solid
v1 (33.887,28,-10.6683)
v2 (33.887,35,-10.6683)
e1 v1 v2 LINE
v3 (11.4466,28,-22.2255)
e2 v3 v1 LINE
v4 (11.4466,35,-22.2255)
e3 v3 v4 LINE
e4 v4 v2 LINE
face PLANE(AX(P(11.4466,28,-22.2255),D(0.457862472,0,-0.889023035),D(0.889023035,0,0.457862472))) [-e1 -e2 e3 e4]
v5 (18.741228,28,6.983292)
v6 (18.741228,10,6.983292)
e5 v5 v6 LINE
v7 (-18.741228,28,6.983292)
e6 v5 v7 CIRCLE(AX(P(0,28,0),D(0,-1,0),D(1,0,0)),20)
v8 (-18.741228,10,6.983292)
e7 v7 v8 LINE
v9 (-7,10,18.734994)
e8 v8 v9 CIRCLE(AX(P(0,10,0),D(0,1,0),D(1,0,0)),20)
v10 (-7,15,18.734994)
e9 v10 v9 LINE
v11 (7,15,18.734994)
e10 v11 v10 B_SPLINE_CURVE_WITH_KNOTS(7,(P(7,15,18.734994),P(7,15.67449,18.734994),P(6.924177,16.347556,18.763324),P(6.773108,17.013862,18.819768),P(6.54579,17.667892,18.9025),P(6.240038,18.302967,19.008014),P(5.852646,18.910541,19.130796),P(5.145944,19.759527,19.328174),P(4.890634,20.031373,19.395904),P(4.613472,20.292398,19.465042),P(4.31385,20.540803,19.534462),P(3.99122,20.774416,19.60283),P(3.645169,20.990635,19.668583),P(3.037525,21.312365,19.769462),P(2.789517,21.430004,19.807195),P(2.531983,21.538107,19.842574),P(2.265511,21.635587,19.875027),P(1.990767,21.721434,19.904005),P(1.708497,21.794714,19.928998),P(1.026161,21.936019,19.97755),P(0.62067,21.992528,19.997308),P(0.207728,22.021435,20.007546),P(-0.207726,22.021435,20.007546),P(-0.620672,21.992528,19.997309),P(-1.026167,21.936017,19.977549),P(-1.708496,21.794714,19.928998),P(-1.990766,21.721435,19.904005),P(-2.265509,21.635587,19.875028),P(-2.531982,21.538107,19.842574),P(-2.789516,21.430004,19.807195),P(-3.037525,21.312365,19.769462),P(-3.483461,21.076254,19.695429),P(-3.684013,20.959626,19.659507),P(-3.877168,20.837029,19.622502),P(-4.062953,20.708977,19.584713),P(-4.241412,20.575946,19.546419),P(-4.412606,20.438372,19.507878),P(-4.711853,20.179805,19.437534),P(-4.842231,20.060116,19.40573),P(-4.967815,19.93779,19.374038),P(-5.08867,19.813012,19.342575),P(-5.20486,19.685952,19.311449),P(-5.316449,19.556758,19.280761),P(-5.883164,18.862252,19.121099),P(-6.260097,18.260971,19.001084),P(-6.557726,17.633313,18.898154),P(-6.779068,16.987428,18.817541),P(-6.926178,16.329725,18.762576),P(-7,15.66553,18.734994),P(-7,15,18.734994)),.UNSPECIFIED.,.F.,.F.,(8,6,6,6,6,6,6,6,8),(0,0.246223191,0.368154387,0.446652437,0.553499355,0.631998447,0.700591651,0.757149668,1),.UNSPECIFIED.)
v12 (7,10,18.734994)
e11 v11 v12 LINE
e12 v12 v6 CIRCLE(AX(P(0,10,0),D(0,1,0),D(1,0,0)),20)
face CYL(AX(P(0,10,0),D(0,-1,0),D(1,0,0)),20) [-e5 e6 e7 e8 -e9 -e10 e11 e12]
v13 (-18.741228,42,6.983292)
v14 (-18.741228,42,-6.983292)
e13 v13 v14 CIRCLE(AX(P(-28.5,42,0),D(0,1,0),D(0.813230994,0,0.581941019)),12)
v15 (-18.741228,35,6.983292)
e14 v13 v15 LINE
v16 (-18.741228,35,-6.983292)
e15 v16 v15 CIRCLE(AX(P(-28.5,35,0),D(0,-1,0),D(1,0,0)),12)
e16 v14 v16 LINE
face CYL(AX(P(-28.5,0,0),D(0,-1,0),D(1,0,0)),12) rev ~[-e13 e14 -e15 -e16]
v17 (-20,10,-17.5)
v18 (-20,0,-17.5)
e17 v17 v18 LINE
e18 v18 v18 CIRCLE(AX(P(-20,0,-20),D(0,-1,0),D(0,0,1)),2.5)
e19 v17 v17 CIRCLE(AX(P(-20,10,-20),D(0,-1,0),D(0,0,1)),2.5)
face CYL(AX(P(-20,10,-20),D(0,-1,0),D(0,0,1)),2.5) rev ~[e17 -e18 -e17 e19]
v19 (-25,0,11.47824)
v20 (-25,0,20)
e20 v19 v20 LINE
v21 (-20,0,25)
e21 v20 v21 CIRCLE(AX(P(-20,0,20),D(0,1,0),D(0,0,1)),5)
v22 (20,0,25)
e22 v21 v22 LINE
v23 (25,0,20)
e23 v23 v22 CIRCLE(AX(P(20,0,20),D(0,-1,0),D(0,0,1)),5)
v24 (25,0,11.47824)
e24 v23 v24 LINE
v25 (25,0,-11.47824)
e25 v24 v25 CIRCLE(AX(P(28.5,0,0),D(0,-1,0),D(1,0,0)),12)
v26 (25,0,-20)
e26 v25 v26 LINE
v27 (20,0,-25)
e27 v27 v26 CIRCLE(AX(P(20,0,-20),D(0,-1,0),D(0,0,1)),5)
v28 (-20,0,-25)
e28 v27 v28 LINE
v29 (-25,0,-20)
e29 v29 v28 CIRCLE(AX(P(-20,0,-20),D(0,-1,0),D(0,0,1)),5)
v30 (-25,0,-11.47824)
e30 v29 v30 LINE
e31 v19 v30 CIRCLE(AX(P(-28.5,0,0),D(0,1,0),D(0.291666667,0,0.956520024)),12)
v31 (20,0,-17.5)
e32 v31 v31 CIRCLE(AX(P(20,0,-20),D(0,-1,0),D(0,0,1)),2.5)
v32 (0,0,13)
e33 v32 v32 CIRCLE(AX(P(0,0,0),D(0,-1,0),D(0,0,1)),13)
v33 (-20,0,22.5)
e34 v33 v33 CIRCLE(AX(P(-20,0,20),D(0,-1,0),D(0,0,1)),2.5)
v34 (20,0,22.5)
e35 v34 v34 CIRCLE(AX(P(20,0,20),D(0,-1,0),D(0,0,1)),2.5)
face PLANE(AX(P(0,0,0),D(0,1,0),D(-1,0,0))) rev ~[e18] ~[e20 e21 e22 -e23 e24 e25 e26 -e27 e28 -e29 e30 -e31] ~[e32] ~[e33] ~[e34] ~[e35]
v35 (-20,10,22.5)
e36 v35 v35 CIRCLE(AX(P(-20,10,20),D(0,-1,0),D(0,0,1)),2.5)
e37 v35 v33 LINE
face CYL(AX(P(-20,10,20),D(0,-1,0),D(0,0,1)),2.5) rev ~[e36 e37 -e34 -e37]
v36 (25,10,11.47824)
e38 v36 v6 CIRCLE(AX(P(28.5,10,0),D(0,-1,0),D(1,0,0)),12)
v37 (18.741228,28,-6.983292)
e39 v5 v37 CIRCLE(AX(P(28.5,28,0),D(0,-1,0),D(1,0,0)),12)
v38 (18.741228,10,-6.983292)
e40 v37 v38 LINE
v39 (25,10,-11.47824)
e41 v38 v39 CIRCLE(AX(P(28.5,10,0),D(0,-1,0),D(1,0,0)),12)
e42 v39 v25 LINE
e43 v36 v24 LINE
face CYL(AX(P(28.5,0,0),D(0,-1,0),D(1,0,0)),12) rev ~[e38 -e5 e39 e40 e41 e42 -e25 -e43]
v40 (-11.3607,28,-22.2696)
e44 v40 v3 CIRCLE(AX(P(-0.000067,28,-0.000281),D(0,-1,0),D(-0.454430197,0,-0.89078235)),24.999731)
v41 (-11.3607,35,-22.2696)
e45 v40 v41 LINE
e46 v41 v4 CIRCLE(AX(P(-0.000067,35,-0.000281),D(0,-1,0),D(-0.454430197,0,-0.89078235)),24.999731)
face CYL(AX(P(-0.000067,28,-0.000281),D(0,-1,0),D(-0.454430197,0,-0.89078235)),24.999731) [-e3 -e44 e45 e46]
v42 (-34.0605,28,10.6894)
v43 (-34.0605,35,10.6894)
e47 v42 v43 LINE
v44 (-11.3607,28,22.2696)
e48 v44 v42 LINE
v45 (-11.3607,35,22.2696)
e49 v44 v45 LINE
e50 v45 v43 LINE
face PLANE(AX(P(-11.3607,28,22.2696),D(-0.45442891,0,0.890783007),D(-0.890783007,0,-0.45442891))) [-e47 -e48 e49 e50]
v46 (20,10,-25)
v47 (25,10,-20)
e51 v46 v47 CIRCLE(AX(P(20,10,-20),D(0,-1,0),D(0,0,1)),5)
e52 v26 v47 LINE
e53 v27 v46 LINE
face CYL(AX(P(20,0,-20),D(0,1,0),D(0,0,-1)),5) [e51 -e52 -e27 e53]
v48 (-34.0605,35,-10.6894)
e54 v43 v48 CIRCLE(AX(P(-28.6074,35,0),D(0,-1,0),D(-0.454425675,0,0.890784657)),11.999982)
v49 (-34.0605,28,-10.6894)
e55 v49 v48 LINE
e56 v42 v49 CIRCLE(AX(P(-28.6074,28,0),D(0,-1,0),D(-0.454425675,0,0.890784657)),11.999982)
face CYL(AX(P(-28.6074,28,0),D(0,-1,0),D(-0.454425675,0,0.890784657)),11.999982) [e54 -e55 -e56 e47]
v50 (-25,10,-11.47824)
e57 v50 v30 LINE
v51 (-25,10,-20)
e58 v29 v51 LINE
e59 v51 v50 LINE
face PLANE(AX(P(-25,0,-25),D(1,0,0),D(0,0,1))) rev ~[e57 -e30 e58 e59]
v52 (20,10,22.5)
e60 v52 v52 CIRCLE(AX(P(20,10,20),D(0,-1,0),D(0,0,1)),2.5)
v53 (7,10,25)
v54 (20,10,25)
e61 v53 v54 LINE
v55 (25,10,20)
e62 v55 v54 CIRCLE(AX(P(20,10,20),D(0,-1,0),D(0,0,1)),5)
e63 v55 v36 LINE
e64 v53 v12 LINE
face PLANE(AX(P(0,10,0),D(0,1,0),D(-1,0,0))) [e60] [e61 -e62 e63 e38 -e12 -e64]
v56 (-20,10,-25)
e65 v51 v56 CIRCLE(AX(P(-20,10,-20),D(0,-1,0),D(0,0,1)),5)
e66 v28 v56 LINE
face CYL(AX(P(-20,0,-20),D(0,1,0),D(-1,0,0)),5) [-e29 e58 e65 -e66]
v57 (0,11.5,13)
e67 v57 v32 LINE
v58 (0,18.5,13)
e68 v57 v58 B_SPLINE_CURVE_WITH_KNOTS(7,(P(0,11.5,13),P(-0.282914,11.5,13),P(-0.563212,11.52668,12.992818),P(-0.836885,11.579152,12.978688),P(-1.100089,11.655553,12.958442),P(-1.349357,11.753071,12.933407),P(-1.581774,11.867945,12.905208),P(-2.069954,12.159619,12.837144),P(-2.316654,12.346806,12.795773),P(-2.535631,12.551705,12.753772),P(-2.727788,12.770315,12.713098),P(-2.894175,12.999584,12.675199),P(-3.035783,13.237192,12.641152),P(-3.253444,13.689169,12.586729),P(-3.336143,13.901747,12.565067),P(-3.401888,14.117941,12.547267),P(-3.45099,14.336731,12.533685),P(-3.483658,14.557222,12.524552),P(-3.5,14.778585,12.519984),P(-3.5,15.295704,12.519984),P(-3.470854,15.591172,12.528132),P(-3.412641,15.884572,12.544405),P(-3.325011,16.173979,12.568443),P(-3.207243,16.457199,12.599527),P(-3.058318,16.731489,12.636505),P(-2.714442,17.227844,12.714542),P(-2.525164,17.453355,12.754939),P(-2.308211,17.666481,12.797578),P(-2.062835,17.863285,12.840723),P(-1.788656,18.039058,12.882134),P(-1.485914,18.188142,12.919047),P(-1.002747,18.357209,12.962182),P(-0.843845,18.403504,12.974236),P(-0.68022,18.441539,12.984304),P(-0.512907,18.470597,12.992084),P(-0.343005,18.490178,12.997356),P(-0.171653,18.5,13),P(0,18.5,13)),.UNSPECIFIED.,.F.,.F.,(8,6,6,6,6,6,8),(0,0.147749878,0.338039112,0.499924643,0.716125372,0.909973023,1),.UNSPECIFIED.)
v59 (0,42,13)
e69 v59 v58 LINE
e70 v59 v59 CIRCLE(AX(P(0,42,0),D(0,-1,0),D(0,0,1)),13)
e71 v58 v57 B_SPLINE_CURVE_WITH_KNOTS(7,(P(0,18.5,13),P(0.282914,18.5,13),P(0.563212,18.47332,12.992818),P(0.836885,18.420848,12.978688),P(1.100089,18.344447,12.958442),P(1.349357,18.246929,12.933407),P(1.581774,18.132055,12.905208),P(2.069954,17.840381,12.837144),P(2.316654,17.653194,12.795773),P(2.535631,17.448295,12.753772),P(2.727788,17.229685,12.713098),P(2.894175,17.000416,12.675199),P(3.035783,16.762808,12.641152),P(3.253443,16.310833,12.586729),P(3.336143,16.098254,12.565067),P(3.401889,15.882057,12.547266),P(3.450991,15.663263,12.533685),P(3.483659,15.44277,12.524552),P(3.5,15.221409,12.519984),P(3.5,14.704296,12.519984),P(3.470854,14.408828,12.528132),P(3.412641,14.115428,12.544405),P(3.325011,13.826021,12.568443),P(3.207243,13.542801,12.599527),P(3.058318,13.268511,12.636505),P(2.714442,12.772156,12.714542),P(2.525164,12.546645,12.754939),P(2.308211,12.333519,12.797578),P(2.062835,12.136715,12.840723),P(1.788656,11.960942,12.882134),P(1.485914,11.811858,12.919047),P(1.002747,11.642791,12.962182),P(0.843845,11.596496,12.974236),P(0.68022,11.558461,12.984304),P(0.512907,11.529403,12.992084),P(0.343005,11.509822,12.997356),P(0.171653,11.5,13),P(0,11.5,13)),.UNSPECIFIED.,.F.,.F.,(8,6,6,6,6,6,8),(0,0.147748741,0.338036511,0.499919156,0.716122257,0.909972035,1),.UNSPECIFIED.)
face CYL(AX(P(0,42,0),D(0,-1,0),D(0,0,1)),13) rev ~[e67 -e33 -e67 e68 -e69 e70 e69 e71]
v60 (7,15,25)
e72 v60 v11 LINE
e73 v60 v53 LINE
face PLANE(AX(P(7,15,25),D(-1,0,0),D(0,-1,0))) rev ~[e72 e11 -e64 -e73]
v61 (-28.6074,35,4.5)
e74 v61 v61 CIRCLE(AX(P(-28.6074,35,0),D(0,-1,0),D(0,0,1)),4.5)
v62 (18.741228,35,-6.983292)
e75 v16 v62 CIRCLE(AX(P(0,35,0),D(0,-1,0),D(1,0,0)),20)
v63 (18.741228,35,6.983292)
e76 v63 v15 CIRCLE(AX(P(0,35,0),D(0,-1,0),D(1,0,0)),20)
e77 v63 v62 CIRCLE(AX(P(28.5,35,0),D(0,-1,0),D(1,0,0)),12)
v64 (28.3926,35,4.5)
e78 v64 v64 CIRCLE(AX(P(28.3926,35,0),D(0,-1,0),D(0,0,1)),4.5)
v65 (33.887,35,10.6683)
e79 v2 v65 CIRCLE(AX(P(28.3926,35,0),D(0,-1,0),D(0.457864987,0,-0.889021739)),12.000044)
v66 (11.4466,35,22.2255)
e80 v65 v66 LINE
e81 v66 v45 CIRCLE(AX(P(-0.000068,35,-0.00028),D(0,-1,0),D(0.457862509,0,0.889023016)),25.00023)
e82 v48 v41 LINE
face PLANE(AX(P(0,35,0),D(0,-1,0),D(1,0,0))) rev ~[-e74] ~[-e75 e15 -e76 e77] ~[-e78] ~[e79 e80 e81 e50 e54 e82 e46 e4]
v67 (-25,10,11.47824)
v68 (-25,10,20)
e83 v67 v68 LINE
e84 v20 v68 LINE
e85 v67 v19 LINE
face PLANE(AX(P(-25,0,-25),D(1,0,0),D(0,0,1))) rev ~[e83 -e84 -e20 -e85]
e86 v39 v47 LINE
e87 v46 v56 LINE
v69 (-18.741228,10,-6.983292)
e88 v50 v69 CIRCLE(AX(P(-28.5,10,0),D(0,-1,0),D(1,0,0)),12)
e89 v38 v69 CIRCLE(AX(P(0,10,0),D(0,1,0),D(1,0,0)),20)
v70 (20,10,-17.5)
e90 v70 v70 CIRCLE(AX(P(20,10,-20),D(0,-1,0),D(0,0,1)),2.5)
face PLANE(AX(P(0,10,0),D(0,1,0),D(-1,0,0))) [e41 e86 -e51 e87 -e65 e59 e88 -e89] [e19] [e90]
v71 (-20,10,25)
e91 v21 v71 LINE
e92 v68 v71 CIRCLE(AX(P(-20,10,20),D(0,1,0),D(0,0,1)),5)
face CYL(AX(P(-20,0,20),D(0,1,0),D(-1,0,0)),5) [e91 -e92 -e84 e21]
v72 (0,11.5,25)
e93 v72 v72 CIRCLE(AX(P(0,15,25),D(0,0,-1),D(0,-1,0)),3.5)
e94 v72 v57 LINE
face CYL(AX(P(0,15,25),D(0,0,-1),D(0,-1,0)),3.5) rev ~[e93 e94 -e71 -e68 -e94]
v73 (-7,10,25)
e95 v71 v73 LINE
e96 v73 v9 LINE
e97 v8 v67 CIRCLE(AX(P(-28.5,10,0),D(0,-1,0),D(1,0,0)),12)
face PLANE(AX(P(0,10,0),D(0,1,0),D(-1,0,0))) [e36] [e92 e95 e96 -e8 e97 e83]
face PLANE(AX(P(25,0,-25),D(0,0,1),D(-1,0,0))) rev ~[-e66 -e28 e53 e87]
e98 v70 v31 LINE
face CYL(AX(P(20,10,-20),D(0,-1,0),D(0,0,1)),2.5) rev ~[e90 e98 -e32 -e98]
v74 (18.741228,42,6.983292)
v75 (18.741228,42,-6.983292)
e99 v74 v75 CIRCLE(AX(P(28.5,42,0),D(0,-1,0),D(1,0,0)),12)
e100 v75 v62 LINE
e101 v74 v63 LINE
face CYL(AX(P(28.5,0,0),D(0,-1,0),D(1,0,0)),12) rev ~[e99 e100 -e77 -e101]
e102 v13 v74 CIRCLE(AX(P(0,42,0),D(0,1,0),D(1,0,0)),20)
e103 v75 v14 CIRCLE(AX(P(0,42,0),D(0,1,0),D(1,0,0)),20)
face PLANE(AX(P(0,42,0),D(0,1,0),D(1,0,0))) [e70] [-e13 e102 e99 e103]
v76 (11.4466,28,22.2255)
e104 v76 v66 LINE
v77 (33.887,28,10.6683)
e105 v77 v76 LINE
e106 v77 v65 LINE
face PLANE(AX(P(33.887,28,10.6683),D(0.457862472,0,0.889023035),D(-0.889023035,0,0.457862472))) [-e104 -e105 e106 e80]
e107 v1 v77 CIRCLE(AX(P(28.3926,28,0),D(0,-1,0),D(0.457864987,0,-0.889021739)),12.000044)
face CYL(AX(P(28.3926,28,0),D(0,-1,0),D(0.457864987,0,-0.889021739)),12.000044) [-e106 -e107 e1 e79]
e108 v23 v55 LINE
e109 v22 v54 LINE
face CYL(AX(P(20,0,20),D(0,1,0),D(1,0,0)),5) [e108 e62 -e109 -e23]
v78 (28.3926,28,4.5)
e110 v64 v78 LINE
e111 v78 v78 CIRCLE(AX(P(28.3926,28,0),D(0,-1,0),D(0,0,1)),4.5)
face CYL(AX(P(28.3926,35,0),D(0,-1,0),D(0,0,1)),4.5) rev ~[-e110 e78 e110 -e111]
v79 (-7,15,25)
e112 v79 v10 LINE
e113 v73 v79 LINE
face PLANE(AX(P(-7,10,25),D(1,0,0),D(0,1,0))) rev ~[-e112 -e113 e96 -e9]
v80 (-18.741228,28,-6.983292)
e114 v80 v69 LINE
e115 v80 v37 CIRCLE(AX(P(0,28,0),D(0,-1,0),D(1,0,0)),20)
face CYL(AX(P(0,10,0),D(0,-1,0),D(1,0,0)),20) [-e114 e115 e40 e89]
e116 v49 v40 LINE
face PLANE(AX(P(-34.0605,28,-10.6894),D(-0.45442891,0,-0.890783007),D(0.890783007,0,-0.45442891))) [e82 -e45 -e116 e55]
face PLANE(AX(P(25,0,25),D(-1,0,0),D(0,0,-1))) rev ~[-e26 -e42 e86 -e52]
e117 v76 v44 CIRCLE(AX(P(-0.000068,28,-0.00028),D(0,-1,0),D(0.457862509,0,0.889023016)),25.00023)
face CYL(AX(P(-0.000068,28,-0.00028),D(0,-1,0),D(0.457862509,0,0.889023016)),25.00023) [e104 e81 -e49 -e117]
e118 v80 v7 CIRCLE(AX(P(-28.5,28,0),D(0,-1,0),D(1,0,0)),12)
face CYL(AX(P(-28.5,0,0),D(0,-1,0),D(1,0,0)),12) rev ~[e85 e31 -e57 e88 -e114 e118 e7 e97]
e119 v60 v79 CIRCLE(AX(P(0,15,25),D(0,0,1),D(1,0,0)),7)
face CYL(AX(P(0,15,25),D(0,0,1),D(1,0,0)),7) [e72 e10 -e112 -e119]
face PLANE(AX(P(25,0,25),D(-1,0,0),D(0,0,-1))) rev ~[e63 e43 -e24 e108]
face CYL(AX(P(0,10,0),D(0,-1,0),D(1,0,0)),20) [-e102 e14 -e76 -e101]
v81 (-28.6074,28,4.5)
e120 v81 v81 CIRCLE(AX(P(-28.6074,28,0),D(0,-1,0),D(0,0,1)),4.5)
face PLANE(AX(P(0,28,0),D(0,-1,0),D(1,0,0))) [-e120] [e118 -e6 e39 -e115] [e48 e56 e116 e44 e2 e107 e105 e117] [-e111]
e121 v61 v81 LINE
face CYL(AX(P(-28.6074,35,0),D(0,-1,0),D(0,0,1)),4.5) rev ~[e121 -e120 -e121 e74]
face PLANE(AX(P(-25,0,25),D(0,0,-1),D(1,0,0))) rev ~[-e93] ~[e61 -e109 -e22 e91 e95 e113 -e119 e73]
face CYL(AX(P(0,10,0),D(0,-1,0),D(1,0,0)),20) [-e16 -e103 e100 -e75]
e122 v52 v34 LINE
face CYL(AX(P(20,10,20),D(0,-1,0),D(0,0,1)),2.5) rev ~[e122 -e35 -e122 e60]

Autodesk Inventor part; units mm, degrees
ref_plane "YZ Plane" through (0, 0, 0) normal (1, 0, 0) x (0, 1, 0)
ref_plane "XZ Plane" through (0, 0, 0) normal (0, 1, 0) x (-1, 0, 0)
sketch "Sketch1" plane through (0, 0, 0) normal (0, 1, 0) x (-1, 0, 0)
  line L0 (25, 25) -> (-25, 25)
  line L1 (-25, 25) -> (-25, -25)
  line L2 (-25, -25) -> (25, -25)
  line L3 (25, -25) -> (25, 25)
  line L4 (25, 25) -> (-25, -25) construction
  line L5 (-25, 25) -> (25, -25) construction
  point P0 (0, 0)
  dimension "d0" = 50
  dimension "d1" = 50
extrude "Extrusion1" add sketch "Sketch1" along normal blind 10
fillet "Fillet1" radius 5 4 edges at (-25, 5, -25) (-25, 5, 25) (25, 5, -25) (25, 5, 25)
sketch "Sketch2" plane through (0, 10, 0) normal (0, 1, 0) x (1, 0, 0)
  circle A0 centre (0, 0) radius 20
  dimension "d5" = 40
extrude "Extrusion2" add sketch "Sketch2" along normal blind 32
sketch "Sketch4" plane through (0, 0, 0) normal (0, -1, 0) x (1, 0, 0)
  circle A0 centre (-28.5, 0) radius 12
  line L0 (0, -36.4497) -> (0, 36.4497) projected
  circle A1 centre (28.5, 0) radius 12
  point P0 (0, 0)
  dimension "d14" = 12
  dimension "d15" = 57
extrude "Extrusion4" cut sketch "Sketch4" against normal through all
ref_plane "Work Plane1" through (0, 28, 0) normal (0, -1, 0) x (1, 0, 0)
sketch "Sketch3" plane through (0, 28, 0) normal (0, -1, 0) x (1, 0, 0)
  line L0 (-34.0605, -10.6894) -> (-11.3607, -22.2696)
  arc A0 (-11.3607, -22.2696) -> (11.4466, -22.2255) centre (0, 0) ccw
  line L1 (11.4466, -22.2255) -> (33.887, -10.6683)
  line L2 (33.887, -10.6683) -> (33.887, -10.6683)
  arc A1 (33.887, -10.6683) -> (33.887, 10.6683) centre (28.3926, 0) ccw
  line L3 (33.887, 10.6683) -> (11.4466, 22.2255)
  arc A2 (11.4466, 22.2255) -> (-11.3607, 22.2696) centre (0, 0) ccw
  arc A3 (-34.0605, 10.6894) -> (-34.0605, -10.6894) centre (-28.6074, 0) ccw
  line L4 (-11.3607, 22.2696) -> (-34.0605, 10.6894)
  dimension "d9" = 25
  dimension "d10" = 12
  dimension "d11" = 57
extrude "Extrusion3" add sketch "Sketch3" against normal blind 7
sketch "Sketch5" plane through (0, 42, 0) normal (0, 1, 0) x (1, 0, 0)
  arc A0 (18.7412, 6.9833) -> (-18.7412, 6.9833) centre (0, 0) ccw projected
hole "Hole1" at (0, 42, 0) direction (0, -1, 0) diameter 26 end through all
sketch "Sketch6" plane through (-20, 0, 25) normal (0, 0, 1) x (1, 0, 0)
  line L0 (0, 10) -> (40, 10) projected
  line L1 (0, 0) -> (40, 0) projected
  line L2 (1.2588, 10) -> (38.7412, 10) projected
  line L3 (13, 10) -> (13, 15)
  arc A0 (27, 15) -> (13, 15) centre (20, 15) ccw
  line L4 (27, 15) -> (27, 10)
  point P0 (20, 0)
  point P1 (20, 0)
  point P2 (20, 0)
  dimension "d25" = 7
  dimension "d26" = 15
extrude "Extrusion5" add sketch "Sketch6" against normal up to surface
sketch "Sketch7" plane through (-20, 0, 25) normal (0, 0, 1) x (1, 0, 0)
  arc A0 (27, 15) -> (13, 15) centre (20, 15) ccw projected
  point P0 (20, 0)
hole "Hole2" at (0, 15, 25) direction (0, 0, -1) diameter 7 end up to surface
sketch "Sketch8" plane through (0, 10, 0) normal (0, 1, 0) x (1, 0, 0)
  arc A0 (-25, -20) -> (-20, -25) centre (-20, -20) ccw projected
  arc A1 (25, 11.4782) -> (18.7412, 6.9833) centre (28.5, 0) ccw projected
  line L0 (25, 11.4782) -> (25, 20) projected
  arc A2 (25, 20) -> (20, 25) centre (20, 20) ccw projected
  line L1 (20, 25) -> (-20, 25) projected
  arc A3 (-20, 25) -> (-25, 20) centre (-20, 20) ccw projected
  line L2 (-25, 20) -> (-25, 11.4782) projected
  arc A4 (-18.7412, 6.9833) -> (-25, 11.4782) centre (-28.5, 0) ccw projected
  arc A5 (18.7412, 6.9833) -> (-18.7412, 6.9833) centre (0, 0) ccw projected
  line L3 (7, -18.735) -> (7, -25) projected
  line L4 (7, -25) -> (20, -25) projected
  arc A6 (20, -25) -> (25, -20) centre (20, -20) ccw projected
  line L5 (25, -20) -> (25, -11.4782) projected
  arc A7 (18.7412, -6.9833) -> (25, -11.4782) centre (28.5, 0) ccw projected
  arc A8 (7, -18.735) -> (18.7412, -6.9833) centre (0, 0) ccw projected
hole "Hole3" at (-20, 10, 20) at (20, 10, 20) at (-20, 10, -20) at (20, 10, -20) direction (0, -1, 0) diameter 5 end through all
sketch "Sketch9" plane through (0, 35, 0) normal (0, 1, 0) x (1, 0, 0)
  arc A0 (-34.0605, 10.6894) -> (-34.0605, -10.6894) centre (-28.6074, 0) ccw projected
  arc A1 (33.887, -10.6683) -> (33.887, 10.6683) centre (28.3926, 0) ccw projected
  point P0 (0, 0)
  point P1 (-28.6074, 0)
hole "Hole4" at (-28.6074, 35, 0) at (28.3926, 35, 0) direction (0, -1, 0) diameter 9 end through all
properties part number "Part025. Connection body" material "Steel, Carbon"
